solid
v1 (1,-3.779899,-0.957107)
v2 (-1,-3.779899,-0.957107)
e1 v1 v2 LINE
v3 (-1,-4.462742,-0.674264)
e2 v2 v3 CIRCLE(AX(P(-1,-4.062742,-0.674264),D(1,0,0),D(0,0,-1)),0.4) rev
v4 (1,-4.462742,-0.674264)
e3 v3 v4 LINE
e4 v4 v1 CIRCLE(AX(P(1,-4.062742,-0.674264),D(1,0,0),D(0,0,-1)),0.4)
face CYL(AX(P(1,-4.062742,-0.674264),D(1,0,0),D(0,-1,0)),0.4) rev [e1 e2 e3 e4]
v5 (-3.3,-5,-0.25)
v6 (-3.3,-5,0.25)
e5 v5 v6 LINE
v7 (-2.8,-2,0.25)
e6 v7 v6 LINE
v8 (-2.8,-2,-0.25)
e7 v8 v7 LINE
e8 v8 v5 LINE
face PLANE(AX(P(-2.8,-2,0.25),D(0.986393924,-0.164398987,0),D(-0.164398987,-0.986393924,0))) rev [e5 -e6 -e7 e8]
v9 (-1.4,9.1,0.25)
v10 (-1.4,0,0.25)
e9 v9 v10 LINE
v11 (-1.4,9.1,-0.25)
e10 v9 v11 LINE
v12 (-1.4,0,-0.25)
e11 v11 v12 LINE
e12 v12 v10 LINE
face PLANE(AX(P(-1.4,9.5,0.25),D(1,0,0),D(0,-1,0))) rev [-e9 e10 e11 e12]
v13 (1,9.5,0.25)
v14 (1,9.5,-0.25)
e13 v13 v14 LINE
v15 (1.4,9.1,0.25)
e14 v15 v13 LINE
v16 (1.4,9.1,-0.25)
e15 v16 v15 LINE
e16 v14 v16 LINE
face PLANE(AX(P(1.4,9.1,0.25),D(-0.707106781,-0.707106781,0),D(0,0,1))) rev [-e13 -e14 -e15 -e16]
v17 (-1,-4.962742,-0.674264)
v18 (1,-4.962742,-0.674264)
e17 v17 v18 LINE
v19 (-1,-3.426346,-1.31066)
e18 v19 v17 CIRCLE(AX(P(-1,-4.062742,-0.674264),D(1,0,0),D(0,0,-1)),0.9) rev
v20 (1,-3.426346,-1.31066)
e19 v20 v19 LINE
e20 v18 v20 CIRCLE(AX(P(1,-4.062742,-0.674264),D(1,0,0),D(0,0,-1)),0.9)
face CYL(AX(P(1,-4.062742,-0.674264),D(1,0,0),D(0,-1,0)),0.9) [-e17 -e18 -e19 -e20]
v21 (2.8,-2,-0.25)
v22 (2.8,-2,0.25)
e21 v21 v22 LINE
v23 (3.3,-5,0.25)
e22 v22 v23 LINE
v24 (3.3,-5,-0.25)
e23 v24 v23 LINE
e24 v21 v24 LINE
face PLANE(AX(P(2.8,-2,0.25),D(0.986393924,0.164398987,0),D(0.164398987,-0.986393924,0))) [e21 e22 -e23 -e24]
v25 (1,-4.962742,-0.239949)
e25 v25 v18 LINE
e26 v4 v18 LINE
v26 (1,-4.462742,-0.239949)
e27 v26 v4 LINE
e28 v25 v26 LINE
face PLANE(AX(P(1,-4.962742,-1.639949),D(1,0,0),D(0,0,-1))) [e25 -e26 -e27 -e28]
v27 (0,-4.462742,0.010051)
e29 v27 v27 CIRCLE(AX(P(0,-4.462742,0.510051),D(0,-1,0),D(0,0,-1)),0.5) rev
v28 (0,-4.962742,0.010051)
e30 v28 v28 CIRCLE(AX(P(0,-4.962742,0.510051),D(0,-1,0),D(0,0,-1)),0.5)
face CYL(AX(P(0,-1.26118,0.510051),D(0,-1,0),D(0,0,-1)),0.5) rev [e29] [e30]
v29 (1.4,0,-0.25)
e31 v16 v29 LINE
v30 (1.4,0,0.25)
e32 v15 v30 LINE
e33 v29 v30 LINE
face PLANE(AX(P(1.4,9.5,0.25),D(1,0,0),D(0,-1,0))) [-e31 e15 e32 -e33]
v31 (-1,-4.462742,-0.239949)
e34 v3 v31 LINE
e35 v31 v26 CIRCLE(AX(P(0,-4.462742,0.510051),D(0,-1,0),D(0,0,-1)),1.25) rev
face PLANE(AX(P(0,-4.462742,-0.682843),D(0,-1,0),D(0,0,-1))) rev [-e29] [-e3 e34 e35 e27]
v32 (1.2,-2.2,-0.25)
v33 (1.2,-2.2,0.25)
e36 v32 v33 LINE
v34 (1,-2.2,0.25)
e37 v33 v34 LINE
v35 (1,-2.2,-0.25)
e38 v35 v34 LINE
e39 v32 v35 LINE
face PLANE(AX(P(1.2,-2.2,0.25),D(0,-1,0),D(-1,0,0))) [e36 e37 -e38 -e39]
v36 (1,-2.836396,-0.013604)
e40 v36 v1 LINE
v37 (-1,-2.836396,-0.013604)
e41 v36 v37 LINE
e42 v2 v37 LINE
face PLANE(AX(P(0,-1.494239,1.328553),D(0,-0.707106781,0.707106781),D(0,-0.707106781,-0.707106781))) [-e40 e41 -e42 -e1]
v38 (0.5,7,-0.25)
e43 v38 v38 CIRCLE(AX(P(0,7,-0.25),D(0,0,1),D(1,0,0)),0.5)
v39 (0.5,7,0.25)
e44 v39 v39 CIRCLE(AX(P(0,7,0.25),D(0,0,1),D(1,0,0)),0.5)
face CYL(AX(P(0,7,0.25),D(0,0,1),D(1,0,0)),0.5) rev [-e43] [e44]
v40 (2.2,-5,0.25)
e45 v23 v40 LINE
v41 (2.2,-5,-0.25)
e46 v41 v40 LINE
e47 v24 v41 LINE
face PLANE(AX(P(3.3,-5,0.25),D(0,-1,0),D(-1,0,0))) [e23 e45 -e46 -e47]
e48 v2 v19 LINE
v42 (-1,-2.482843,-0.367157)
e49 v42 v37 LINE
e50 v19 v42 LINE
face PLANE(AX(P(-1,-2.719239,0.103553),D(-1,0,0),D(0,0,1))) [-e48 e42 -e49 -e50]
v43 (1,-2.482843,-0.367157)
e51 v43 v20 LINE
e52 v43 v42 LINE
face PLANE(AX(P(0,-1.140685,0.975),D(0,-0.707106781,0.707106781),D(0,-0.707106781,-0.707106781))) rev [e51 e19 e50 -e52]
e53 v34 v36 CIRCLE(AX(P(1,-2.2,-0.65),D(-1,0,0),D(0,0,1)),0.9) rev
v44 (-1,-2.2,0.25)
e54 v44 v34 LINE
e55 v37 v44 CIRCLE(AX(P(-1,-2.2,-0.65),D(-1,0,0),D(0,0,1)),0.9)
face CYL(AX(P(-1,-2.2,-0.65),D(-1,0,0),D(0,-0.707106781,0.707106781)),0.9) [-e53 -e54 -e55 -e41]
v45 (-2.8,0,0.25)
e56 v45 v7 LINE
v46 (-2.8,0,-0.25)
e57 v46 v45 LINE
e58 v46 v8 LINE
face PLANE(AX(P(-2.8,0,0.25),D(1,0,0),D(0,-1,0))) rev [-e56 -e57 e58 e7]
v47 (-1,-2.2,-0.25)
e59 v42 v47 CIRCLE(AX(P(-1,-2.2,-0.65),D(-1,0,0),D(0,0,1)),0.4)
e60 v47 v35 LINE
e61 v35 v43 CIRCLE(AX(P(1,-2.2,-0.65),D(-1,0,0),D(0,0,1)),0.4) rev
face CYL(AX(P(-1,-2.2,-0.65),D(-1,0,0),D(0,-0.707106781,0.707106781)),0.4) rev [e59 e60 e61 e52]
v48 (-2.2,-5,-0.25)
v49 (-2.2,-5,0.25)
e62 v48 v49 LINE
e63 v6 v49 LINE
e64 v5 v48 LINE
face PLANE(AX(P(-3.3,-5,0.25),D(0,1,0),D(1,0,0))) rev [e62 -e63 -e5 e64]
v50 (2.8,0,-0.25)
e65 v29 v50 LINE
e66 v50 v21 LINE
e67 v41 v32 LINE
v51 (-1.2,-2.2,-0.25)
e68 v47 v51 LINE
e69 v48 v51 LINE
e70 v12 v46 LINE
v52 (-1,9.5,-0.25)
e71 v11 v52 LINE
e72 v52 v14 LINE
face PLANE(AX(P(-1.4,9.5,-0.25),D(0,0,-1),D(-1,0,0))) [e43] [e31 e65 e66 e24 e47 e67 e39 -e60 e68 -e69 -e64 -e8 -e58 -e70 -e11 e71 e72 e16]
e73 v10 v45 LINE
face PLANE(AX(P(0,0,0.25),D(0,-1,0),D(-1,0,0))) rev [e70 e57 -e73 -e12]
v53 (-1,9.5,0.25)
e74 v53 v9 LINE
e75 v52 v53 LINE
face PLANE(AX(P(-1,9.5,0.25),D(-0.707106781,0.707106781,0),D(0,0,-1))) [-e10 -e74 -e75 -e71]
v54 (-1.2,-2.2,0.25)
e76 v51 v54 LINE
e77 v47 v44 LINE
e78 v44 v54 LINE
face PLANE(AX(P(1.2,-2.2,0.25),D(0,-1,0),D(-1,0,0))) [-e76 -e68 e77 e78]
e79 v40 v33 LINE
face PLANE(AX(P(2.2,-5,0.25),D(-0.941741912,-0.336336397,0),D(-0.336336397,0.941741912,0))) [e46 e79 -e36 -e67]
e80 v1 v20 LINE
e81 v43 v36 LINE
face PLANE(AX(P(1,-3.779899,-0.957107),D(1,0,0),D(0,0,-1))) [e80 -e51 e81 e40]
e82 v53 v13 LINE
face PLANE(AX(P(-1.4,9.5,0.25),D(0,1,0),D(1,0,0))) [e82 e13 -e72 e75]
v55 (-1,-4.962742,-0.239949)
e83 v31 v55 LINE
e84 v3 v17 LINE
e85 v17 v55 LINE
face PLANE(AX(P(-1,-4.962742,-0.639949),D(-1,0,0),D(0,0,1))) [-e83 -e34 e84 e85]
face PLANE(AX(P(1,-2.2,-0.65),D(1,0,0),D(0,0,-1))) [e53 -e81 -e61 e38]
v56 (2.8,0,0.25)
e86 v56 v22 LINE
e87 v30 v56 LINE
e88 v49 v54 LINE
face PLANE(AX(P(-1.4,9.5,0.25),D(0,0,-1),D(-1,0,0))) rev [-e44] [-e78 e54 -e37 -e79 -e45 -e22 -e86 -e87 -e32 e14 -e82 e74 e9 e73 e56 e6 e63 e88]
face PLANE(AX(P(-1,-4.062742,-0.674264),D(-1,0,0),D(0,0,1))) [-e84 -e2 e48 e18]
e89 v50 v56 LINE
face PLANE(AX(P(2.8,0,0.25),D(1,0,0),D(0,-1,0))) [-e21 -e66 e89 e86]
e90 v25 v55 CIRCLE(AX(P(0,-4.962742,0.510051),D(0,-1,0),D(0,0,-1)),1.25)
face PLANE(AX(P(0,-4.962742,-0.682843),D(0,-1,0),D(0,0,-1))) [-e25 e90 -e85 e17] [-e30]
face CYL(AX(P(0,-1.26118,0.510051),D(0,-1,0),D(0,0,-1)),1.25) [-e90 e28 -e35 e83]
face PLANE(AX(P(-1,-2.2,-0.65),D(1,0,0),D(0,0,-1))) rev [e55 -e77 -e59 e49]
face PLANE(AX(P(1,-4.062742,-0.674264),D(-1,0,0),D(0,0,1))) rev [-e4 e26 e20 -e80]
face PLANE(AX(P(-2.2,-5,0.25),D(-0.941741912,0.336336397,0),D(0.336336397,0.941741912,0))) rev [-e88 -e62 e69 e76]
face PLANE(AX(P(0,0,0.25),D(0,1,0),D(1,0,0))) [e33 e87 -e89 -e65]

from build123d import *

# Parameters (mm, degrees)
MAINBODYS_W                           = 2.8
MAINBODYS_H                           = 0.5
MAIN_BODY_DEPTH                       = 9.5
BOTTOM_OF_MAIN_BODY_REACH             = 11.606
BOTTOM_OF_MAIN_BODY_DIRECTION_2_REACH = 11.606
TOPHOLES_R                            = 0.5
TOP_HOLE_DEPTH                        = 11.069260152
F_45_DEGREE_FLANGE_DEPTH              = 2
BOTTOM_FLAT_FLANGE_DEPTH              = 2
EXTENDEDBOTTOMFLANGES_W               = 2
EXTENDEDBOTTOMFLANGES_H               = 0.5
EXTENDED_BOTTOM_FLANGE_DEPTH          = 0.4
BOSSEDCYLINDERBODYS_R                 = 0.5
BOSSED_CYLINDER_BODY_DEPTH            = 0.5
C_MAIN_BODY_SIZE                      = 0.4


# Sheet-metal steps are written as plain solids
with BuildPart() as part:
    # MainBodyS → MAIN BODY (new body)
    with BuildSketch(Plane(origin=(0, 0, 0), x_dir=(1, 0, 0), z_dir=(0, 1, 0))):
        Rectangle(MAINBODYS_W, MAINBODYS_H)
    extrude(amount=MAIN_BODY_DEPTH)

    # BOTTOM OF MAIN BODY: up to this face of the body (flat: up to its plane)
    bottom_of_main_body_end = Plane(part.part.faces().sort_by_distance((0, 4.75, 0.25))[0])
    # BottomMainBodyS → BOTTOM OF MAIN BODY (add, up to the picked face)
    with BuildSketch(Plane.XY, mode=Mode.PRIVATE) as bottom_of_main_body_sk1:
        Polygon((0, 0), (2.8, 0), (2.8, -2), (3.3, -5), (2.2, -5), (1.2, -2.2), (0, -2.2), align=None)
    bottom_of_main_body_tool1 = split(extrude(bottom_of_main_body_sk1.sketch, amount=BOTTOM_OF_MAIN_BODY_REACH, mode=Mode.PRIVATE), bisect_by=bottom_of_main_body_end, keep=Keep.BOTH, mode=Mode.PRIVATE)
    bottom_of_main_body = bottom_of_main_body_tool1.solids().sort_by(Axis((1.768001, -2.02309, 0), (0, 0, 1)))[0]
    add(bottom_of_main_body)

    # BOTTOM OF MAIN BODY direction 2: up to this face of the body (flat: up to its plane)
    bottom_of_main_body_direction_2_end = Plane(part.part.faces().sort_by_distance((0, 4.75, -0.25))[0])
    # BottomMainBodyS → BOTTOM OF MAIN BODY direction 2 (add, up to the picked face)
    with BuildSketch(Plane.XY, mode=Mode.PRIVATE) as bottom_of_main_body_direction_2_sk1:
        Polygon((0, 0), (2.8, 0), (2.8, -2), (3.3, -5), (2.2, -5), (1.2, -2.2), (0, -2.2), align=None)
    bottom_of_main_body_direction_2_tool1 = split(extrude(bottom_of_main_body_direction_2_sk1.sketch, amount=-BOTTOM_OF_MAIN_BODY_DIRECTION_2_REACH, mode=Mode.PRIVATE), bisect_by=bottom_of_main_body_direction_2_end, keep=Keep.BOTH, mode=Mode.PRIVATE)
    bottom_of_main_body_direction_2 = bottom_of_main_body_direction_2_tool1.solids().sort_by(Axis((1.768001, -2.02309, 0), (0, 0, -1)))[0]
    add(bottom_of_main_body_direction_2)

    # BMB HM: BOTTOM OF MAIN BODY, BOTTOM OF MAIN BODY direction 2 across plane
    add(bottom_of_main_body.mirror(Plane(origin=(0, 0, 0), x_dir=(0, 0, 1), z_dir=(1, 0, 0))))
    add(bottom_of_main_body_direction_2.mirror(Plane(origin=(0, 0, 0), x_dir=(0, 0, 1), z_dir=(1, 0, 0))))

    # TopHoleS → TOP HOLE (cut, through all)
    with BuildSketch(Plane.XY.offset(0.25)):
        with Locations((0, 7)):
            Circle(TOPHOLES_R)
    extrude(amount=-TOP_HOLE_DEPTH, mode=Mode.SUBTRACT)

    # 45 DEGREE FLANGE section (across the edge) → 45 DEGREE FLANGE (add)
    with BuildSketch(Plane(origin=(1, -2.365685425, -0.25), x_dir=(0, 0.7071067811865438, -0.7071067811865512), z_dir=(-1, 0, 0))):
        with BuildLine():
            Line((-0.5, 0.165685425), (-0.5, 1.5))
            Line((-0.5, 1.5), (0, 1.5))
            Line((0, 1.5), (0, 0.165685425))
            ThreePointArc((0, 0.165685425), (0.030448187, 0.012612052), (0.117157288, -0.117157288))
            Line((0.117157288, -0.117157288), (-0.236396103, -0.470710678))
            ThreePointArc((-0.236396103, -0.470710678), (-0.431491579, -0.178729664), (-0.5, 0.165685425))
        make_face()
    extrude(amount=F_45_DEGREE_FLANGE_DEPTH)

    # BOTTOM FLAT FLANGE section (across the edge) → BOTTOM FLAT FLANGE (add)
    with BuildSketch(Plane(origin=(-1, -4.4627417, -1.639949494), x_dir=(0, 1, 0), z_dir=(1, 0, 0))):
        with BuildLine():
            Line((-0.5, 0.965685425), (-0.5, 1))
            Line((-0.5, 1), (0, 1))
            Line((0, 1), (0, 0.965685425))
            ThreePointArc((0, 0.965685425), (0.246926627, 0.596133612), (0.682842712, 0.682842712))
            Line((0.682842712, 0.682842712), (1.036396103, 0.329289322))
            ThreePointArc((1.036396103, 0.329289322), (0.055584911, 0.134193846), (-0.5, 0.965685425))
        make_face()
    extrude(amount=BOTTOM_FLAT_FLANGE_DEPTH)

    # ExtendedBottomFlangeS → EXTENDED BOTTOM FLANGE (add)
    with BuildSketch(Plane.XY.offset(-0.639949494)):
        with Locations((0, -4.7127417)):
            Rectangle(EXTENDEDBOTTOMFLANGES_W, EXTENDEDBOTTOMFLANGES_H)
    extrude(amount=EXTENDED_BOTTOM_FLANGE_DEPTH)

    # BossedCylinderBodyS → BOSSED  CYLINDER BODY (add)
    with BuildSketch(Plane.XZ.offset(4.9627417)):
        with BuildLine():
            Line((-1, -0.239949494), (1, -0.239949494))
            ThreePointArc((1, -0.239949494), (0, 1.760050506), (-1, -0.239949494))
        make_face()
        with Locations(Location((0, 0.510050506, 0), (0, 0, 270))):
            Circle(BOSSEDCYLINDERBODYS_R, mode=Mode.SUBTRACT)
    extrude(amount=-BOSSED_CYLINDER_BODY_DEPTH)

    # C MAIN BODY
    c_main_body_edges = [part.edges().sort_by_distance(p)[0] for p in [
        (-1.4, 9.5, 0),
        (1.4, 9.5, 0),
    ]]
    chamfer(c_main_body_edges, length=C_MAIN_BODY_SIZE)


solid = part.part
